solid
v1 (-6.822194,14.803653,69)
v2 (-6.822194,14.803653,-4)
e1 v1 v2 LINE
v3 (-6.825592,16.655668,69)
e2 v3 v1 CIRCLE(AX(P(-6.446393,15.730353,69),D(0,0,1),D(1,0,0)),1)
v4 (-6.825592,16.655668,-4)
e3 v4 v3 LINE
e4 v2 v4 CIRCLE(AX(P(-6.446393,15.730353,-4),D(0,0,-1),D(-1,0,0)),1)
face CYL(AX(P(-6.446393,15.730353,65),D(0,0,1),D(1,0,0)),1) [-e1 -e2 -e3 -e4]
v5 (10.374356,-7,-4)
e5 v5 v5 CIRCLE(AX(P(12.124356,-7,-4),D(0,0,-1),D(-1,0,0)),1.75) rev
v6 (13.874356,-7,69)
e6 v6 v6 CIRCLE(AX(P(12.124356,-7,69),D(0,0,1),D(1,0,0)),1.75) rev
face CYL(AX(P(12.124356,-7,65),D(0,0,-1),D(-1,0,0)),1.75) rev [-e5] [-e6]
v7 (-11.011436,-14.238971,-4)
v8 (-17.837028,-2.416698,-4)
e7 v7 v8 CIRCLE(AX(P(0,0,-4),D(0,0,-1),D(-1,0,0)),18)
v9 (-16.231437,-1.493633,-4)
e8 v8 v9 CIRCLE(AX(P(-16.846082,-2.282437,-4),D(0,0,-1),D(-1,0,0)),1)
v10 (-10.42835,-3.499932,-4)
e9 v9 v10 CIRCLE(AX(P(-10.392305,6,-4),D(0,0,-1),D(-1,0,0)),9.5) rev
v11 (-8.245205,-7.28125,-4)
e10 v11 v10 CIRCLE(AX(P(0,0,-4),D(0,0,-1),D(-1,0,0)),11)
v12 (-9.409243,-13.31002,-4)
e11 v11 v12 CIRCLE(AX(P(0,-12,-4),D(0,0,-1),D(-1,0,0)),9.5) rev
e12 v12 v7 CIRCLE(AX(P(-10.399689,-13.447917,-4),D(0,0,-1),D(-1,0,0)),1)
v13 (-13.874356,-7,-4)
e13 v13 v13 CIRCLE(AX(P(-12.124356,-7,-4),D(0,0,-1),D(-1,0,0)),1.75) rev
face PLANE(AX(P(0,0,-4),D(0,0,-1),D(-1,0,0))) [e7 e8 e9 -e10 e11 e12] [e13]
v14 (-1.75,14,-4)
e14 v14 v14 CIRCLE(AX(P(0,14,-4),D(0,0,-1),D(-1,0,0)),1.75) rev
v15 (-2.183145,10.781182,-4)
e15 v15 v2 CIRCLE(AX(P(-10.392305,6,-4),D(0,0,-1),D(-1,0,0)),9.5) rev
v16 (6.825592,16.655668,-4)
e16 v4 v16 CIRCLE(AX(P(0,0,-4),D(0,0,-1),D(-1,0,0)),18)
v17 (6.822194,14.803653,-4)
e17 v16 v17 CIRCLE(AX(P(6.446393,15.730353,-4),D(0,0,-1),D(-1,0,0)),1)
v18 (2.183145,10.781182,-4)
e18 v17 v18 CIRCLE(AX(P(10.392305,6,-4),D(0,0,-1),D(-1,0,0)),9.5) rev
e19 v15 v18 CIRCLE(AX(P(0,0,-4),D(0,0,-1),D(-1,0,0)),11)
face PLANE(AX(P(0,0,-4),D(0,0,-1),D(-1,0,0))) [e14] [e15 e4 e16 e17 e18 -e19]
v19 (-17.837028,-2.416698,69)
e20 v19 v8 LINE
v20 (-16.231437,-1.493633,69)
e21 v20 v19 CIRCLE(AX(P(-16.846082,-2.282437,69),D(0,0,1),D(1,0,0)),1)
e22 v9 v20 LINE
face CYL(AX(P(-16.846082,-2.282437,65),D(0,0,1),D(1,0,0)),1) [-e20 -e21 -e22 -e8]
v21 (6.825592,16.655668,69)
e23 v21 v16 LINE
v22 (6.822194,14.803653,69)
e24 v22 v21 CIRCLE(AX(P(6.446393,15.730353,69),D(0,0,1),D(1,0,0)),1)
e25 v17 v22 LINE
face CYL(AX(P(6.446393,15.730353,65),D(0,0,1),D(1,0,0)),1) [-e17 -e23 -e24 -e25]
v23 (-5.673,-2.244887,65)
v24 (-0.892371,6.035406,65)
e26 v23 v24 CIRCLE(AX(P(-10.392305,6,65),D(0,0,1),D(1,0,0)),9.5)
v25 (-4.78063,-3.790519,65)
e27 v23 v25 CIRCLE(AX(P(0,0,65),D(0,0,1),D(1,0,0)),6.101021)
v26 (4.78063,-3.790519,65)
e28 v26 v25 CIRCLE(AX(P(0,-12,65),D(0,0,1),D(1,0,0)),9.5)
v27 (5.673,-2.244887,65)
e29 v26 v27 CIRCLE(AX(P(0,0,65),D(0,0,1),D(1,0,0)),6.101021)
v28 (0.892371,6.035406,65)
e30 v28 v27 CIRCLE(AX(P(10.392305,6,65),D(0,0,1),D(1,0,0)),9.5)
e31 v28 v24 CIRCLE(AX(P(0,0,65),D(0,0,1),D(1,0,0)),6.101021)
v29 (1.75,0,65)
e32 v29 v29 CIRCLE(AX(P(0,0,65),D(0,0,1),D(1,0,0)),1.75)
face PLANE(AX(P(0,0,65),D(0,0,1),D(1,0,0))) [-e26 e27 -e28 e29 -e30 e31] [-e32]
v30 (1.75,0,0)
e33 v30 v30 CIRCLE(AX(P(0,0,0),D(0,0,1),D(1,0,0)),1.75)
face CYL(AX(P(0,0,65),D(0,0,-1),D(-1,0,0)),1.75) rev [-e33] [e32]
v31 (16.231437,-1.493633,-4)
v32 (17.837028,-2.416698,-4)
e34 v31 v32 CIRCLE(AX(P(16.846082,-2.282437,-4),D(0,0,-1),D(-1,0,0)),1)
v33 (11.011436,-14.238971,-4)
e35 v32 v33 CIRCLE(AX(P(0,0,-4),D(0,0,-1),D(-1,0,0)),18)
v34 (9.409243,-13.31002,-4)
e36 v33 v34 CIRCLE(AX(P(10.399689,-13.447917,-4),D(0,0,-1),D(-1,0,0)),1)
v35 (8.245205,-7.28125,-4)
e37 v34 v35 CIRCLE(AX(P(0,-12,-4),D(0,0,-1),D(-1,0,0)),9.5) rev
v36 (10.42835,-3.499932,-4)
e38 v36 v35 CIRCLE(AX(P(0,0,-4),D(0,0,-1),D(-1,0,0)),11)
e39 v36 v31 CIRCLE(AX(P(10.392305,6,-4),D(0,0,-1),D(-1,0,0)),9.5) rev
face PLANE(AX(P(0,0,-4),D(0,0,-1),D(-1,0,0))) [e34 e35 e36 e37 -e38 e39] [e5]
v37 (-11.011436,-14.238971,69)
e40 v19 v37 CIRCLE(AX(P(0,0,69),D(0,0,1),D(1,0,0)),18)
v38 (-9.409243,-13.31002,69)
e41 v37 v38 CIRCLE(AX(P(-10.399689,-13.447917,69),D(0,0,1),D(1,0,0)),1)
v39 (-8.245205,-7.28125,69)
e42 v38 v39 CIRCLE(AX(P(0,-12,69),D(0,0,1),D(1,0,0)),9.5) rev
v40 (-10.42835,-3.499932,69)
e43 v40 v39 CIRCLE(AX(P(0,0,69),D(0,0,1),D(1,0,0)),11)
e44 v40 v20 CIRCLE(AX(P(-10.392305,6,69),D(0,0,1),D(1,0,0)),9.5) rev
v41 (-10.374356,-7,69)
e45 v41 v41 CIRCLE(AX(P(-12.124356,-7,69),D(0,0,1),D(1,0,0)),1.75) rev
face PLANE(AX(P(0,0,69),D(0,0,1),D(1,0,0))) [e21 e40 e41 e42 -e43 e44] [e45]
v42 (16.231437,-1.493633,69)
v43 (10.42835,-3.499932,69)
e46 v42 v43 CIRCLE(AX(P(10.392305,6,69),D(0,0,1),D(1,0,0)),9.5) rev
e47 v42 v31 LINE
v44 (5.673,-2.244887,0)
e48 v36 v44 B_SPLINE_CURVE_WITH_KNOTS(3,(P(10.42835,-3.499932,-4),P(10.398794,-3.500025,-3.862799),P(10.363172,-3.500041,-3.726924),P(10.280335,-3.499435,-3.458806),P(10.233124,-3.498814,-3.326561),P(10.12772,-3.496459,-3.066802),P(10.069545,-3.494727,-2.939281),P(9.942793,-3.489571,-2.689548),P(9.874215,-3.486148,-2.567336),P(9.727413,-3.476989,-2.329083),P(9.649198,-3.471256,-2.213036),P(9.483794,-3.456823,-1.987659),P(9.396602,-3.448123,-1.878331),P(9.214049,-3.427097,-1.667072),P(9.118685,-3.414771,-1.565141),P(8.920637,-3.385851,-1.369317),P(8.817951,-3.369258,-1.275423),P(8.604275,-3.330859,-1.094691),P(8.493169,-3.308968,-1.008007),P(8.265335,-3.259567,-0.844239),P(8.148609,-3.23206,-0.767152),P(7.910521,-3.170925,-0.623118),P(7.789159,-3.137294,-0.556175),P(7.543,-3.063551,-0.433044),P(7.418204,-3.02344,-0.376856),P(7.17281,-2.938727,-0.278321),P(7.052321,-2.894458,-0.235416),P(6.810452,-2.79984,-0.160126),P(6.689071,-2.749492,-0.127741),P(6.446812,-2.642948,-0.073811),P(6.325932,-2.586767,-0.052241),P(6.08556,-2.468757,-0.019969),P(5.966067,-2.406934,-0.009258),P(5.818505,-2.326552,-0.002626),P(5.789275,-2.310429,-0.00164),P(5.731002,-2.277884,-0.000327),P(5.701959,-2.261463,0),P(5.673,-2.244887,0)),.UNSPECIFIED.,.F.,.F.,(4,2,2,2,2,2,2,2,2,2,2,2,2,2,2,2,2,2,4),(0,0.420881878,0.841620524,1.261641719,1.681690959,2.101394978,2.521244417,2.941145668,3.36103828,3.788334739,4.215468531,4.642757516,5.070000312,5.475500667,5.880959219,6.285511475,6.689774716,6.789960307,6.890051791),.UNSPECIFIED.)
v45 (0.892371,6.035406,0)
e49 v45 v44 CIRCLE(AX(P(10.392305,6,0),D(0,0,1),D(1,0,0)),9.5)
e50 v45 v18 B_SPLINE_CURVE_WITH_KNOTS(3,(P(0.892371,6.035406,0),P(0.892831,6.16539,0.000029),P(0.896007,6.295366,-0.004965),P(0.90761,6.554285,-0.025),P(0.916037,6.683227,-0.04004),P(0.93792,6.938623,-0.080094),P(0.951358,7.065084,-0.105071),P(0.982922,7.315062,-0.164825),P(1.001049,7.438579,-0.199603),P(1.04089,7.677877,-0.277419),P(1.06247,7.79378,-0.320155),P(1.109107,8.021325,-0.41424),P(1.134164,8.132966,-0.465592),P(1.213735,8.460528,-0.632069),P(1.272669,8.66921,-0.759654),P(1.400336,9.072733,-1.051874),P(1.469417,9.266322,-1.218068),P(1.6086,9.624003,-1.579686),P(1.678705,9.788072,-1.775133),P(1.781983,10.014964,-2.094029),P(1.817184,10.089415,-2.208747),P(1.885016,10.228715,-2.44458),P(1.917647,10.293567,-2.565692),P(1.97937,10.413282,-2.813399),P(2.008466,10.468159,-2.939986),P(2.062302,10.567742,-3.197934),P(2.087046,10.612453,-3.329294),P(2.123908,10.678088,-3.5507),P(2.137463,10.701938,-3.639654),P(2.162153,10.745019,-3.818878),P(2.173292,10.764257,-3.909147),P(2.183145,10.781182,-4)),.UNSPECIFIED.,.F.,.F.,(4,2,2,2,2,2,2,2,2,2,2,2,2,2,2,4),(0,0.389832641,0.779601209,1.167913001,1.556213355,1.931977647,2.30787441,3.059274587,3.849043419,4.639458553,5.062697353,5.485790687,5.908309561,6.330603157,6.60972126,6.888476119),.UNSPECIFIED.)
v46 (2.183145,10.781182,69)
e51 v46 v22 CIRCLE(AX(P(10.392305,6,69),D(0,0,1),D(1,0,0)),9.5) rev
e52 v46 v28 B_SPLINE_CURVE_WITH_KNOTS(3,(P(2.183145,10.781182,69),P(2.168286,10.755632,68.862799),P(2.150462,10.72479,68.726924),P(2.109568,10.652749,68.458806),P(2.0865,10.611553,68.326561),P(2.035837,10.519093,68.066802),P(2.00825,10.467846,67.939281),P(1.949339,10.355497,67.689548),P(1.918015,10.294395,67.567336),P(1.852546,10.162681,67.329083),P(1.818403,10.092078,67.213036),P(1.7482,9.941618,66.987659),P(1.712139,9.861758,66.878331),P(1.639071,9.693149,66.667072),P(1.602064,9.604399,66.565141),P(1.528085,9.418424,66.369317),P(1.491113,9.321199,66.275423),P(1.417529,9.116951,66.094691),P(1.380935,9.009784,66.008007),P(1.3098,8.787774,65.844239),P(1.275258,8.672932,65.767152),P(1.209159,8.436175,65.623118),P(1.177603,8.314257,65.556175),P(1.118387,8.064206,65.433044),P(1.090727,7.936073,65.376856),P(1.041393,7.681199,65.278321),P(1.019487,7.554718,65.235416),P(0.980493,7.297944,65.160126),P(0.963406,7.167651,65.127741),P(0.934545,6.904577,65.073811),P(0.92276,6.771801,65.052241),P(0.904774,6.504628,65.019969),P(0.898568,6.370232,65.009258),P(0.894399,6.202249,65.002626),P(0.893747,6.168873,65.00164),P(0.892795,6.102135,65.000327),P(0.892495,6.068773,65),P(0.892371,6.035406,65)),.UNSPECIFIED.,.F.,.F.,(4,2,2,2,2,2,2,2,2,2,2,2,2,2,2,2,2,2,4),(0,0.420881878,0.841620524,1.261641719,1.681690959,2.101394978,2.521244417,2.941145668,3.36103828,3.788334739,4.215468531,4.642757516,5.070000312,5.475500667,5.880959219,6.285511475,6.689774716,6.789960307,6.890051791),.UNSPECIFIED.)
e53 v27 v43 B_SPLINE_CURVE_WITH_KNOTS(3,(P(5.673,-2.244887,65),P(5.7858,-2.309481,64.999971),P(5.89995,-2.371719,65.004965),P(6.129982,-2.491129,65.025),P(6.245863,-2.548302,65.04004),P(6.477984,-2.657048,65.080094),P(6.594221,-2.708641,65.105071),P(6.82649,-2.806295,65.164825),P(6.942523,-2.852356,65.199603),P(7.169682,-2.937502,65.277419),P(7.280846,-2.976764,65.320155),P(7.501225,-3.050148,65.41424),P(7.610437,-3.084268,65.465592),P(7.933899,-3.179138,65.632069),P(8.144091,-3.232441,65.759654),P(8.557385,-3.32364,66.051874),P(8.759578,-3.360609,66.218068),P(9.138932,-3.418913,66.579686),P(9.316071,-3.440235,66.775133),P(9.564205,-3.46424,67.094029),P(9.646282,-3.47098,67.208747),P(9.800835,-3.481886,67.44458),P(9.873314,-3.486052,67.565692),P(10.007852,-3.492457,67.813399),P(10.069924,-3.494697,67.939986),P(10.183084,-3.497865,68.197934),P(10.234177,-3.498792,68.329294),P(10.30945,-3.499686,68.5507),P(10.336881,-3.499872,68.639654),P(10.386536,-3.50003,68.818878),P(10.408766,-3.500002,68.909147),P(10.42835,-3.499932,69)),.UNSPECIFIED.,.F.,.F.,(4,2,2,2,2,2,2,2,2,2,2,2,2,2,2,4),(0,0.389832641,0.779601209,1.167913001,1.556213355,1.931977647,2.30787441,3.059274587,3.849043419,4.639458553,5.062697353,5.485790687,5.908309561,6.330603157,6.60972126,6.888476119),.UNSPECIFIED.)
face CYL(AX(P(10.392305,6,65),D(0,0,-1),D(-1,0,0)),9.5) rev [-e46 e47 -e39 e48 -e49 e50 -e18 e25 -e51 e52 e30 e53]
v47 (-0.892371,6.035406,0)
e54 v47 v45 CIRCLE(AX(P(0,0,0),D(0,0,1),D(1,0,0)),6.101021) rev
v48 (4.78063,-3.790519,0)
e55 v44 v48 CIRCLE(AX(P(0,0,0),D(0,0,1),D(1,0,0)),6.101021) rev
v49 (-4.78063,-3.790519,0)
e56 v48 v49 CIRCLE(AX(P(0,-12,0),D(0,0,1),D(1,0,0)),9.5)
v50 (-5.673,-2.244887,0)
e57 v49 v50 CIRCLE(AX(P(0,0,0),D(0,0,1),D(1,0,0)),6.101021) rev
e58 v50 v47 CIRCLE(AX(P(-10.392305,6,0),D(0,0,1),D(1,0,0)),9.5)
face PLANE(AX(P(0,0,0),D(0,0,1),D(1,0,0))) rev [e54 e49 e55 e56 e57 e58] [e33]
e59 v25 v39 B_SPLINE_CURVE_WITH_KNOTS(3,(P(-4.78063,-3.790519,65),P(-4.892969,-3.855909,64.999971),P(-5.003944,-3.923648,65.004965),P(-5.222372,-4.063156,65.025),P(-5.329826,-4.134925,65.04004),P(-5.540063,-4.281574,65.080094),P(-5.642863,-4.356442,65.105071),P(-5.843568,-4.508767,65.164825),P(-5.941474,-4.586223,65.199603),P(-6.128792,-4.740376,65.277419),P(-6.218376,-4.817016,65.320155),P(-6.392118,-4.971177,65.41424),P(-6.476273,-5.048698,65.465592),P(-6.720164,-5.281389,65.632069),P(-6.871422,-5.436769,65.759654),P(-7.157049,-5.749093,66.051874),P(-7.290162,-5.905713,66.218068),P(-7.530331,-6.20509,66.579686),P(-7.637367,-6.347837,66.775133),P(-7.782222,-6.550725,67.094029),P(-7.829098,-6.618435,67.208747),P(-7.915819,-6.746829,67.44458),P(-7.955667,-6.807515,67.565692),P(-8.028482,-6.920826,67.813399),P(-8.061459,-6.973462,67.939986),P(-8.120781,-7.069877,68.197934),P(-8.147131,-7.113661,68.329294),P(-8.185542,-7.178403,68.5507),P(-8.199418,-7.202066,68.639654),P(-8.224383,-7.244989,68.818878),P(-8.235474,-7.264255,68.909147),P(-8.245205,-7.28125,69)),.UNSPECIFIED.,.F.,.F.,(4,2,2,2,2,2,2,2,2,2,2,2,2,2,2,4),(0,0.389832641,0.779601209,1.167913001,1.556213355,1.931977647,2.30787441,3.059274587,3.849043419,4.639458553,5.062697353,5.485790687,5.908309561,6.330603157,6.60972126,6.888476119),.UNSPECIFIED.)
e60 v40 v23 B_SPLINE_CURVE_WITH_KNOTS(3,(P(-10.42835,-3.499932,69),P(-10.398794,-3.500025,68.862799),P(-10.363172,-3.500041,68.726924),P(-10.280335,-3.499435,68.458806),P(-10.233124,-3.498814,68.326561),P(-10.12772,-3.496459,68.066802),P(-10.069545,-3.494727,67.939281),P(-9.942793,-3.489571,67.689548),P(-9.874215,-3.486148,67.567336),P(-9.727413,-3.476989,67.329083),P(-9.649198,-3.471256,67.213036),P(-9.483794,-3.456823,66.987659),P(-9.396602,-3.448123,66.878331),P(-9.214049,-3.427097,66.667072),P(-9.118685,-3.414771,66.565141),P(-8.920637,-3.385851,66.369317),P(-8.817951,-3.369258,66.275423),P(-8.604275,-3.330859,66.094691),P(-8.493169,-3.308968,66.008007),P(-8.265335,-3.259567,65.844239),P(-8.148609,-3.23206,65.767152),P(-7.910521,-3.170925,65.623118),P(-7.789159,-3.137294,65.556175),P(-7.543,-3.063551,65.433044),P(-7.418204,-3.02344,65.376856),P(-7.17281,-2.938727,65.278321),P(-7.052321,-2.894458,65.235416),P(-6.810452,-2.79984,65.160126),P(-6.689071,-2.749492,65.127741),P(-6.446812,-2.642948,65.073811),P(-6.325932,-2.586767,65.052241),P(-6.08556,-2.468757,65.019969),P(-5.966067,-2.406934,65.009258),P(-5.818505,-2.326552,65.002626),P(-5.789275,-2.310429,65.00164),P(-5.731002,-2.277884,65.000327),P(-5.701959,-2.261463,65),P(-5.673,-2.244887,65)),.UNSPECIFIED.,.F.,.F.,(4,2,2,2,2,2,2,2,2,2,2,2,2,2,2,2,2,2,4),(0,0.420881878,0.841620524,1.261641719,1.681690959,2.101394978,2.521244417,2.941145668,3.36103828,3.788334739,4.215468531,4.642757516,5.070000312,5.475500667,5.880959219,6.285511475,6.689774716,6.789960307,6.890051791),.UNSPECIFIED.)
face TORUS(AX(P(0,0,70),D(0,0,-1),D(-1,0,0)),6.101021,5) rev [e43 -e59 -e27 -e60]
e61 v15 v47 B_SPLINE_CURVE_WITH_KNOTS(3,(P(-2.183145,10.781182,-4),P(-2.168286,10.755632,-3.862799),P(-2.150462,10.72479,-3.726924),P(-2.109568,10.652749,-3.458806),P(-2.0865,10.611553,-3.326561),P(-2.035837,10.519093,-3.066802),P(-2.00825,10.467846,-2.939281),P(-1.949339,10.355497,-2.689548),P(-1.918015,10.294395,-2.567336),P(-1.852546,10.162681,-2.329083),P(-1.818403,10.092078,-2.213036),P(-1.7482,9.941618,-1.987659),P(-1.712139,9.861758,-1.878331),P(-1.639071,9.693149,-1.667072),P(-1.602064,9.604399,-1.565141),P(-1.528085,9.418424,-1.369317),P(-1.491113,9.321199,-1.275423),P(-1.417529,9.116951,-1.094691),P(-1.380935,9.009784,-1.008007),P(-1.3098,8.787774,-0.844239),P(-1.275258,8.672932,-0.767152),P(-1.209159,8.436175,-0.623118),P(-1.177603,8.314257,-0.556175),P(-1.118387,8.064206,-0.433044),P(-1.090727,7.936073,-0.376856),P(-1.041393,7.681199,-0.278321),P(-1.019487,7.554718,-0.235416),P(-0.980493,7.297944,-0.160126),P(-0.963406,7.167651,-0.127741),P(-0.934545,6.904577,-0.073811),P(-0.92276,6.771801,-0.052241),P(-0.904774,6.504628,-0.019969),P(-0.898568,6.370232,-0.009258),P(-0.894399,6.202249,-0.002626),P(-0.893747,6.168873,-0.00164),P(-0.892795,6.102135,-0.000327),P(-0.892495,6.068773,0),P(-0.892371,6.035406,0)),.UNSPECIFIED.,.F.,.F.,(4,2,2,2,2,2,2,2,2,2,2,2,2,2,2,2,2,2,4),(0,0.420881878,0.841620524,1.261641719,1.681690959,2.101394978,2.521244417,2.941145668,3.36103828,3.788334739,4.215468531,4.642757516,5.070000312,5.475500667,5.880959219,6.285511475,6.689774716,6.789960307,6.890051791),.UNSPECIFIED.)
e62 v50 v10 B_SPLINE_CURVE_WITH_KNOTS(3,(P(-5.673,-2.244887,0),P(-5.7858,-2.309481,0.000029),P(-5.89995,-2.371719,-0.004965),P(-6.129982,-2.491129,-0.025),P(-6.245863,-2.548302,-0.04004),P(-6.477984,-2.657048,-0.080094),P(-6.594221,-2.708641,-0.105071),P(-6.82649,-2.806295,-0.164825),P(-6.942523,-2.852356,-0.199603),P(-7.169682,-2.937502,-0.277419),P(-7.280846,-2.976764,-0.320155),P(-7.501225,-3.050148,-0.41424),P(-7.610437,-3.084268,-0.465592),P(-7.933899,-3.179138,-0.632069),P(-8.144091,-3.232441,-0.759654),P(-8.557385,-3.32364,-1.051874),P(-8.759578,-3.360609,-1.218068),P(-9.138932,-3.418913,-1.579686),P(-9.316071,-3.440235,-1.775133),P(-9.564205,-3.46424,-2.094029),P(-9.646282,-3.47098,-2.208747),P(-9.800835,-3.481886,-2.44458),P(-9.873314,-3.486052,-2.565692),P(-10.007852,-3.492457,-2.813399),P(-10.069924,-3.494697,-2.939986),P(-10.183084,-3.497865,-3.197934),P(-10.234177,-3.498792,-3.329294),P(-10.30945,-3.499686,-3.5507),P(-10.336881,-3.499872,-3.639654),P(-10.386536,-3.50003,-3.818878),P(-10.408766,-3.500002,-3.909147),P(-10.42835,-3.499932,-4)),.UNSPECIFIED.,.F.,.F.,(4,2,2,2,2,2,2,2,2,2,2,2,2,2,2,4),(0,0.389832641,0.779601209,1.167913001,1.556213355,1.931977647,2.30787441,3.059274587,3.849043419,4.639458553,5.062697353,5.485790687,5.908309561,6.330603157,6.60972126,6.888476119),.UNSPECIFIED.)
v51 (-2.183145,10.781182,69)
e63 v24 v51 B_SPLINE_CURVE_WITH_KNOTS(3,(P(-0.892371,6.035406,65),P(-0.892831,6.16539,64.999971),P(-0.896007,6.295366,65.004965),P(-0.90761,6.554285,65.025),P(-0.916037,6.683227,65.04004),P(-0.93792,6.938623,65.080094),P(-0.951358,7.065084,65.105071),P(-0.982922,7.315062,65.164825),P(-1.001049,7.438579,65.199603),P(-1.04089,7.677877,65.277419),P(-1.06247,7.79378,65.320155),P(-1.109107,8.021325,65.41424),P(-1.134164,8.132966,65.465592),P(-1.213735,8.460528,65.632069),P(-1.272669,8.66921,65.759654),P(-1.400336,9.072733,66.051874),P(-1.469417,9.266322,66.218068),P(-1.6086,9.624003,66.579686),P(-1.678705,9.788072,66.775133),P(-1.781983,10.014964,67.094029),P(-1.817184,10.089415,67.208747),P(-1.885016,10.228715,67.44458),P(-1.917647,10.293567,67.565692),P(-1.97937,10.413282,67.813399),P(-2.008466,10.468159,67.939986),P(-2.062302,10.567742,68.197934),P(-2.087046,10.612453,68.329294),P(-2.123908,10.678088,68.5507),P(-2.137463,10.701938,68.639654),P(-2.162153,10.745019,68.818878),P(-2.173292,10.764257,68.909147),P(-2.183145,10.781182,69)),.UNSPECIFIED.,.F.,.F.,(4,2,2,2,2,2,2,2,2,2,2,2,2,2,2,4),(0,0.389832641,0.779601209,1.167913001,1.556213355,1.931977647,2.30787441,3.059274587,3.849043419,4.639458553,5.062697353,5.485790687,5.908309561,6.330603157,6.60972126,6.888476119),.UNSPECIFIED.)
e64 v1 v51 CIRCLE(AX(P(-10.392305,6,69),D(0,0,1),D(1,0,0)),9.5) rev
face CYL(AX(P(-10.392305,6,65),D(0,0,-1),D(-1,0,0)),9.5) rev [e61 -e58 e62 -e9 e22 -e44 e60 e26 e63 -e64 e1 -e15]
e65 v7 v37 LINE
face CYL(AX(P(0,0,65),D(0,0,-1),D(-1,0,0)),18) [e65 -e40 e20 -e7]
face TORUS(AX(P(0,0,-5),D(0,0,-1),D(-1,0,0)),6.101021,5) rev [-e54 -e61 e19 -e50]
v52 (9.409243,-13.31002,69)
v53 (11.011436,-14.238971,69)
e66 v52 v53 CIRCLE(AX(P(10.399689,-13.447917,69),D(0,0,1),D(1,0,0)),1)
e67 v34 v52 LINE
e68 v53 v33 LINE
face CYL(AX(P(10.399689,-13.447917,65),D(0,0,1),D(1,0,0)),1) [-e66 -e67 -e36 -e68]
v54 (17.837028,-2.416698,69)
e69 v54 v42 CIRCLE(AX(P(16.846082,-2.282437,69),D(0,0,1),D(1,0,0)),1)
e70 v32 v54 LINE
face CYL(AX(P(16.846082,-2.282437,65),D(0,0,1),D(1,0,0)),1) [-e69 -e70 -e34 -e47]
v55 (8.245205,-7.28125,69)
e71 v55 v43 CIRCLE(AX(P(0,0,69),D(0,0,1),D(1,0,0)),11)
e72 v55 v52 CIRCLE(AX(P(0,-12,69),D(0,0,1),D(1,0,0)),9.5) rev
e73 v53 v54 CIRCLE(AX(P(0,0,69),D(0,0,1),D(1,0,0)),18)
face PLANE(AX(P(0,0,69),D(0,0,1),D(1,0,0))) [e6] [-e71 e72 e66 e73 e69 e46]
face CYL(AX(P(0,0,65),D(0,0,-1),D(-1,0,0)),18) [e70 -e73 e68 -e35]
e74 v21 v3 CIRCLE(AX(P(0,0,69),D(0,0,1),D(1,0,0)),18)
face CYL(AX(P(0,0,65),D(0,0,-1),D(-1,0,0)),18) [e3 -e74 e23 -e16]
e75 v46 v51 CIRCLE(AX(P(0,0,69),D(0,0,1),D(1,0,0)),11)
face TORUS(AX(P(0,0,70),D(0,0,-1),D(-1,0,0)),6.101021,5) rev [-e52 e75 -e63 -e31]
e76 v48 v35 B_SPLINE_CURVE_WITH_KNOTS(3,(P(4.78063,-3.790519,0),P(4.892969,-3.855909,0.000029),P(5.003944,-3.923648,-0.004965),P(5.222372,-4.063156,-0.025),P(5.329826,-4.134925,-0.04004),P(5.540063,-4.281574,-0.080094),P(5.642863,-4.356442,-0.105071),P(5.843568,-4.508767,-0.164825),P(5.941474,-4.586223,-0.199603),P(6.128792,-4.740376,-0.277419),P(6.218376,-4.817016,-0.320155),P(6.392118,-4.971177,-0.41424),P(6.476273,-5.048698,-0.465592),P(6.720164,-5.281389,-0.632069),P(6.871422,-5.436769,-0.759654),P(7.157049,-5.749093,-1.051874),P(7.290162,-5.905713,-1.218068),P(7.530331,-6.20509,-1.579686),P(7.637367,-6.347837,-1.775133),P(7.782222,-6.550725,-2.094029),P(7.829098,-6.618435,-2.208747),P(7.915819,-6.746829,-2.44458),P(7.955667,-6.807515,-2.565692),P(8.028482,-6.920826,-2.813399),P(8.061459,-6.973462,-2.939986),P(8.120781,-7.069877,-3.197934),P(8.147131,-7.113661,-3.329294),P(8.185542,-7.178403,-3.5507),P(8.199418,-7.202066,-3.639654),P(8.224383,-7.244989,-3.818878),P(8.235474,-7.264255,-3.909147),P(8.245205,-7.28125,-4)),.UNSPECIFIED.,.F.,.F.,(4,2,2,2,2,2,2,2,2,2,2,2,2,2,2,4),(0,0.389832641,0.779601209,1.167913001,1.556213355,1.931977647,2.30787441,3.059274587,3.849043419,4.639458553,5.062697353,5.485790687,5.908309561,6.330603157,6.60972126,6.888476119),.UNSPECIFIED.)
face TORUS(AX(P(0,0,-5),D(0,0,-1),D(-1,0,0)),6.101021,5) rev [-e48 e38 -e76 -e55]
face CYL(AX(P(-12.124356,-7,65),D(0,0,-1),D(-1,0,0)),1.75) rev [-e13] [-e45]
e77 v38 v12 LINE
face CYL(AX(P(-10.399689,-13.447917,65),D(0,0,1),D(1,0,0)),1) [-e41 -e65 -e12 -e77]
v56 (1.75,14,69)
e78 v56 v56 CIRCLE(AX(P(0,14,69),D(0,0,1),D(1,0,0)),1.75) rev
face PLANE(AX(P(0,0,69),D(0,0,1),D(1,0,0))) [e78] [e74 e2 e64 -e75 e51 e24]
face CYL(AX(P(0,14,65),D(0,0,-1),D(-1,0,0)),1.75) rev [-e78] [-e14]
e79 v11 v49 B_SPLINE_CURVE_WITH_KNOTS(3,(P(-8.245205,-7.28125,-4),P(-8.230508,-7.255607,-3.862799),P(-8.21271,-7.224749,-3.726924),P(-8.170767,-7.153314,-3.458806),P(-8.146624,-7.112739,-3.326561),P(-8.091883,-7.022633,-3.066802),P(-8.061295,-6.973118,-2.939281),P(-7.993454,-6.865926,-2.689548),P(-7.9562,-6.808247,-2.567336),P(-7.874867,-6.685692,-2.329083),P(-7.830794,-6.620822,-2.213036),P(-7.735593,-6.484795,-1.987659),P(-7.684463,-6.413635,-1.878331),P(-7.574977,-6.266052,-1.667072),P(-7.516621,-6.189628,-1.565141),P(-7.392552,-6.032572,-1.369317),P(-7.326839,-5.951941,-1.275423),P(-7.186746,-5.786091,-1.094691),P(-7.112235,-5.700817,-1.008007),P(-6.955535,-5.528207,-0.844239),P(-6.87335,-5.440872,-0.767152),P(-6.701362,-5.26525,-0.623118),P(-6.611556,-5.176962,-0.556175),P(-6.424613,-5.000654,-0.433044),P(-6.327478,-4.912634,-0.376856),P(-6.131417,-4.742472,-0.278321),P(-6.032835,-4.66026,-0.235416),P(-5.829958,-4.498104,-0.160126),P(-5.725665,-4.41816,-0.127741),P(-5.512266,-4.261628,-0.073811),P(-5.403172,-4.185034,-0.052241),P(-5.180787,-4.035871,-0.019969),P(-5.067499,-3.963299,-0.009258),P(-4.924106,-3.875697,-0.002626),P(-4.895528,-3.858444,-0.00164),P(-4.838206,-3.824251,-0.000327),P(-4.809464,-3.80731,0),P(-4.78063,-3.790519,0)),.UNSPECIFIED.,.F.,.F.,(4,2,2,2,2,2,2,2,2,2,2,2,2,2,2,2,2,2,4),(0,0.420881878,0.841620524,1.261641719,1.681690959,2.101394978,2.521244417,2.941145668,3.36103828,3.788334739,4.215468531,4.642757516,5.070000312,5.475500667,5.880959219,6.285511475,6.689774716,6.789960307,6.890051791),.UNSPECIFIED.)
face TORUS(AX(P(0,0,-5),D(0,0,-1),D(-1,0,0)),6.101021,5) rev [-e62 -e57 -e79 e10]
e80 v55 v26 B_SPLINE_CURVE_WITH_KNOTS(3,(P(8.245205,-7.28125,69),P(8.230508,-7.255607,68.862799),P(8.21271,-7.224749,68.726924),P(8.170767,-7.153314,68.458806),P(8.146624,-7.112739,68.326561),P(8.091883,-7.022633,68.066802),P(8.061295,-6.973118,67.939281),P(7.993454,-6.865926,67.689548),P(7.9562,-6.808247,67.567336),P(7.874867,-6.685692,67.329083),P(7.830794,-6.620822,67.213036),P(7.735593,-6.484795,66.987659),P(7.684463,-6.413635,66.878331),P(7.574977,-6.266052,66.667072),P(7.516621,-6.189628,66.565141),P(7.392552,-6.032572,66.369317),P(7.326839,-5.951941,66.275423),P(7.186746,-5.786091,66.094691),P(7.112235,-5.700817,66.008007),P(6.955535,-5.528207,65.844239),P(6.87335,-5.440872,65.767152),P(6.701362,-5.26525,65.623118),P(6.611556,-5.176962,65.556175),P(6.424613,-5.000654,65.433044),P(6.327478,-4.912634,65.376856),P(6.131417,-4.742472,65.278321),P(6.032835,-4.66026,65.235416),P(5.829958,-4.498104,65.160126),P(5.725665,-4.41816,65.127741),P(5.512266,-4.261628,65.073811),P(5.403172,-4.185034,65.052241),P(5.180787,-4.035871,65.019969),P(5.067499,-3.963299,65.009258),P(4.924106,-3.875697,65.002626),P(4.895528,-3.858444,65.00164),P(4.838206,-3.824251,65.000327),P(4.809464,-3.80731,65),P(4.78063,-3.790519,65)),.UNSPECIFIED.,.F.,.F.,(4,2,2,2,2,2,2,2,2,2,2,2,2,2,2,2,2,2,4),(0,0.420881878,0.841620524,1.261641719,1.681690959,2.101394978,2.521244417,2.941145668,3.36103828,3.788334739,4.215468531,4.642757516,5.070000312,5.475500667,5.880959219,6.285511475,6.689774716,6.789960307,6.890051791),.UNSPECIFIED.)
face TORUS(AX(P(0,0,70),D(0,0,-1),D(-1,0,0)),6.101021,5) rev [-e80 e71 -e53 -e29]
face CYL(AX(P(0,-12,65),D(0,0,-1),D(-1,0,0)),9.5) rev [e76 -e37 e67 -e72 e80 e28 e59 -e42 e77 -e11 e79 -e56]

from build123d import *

# Parameters (mm, degrees)
SKETCH_1_R      = 1.75
EXTRUDE_1_DEPTH = 65
FILLET_1_R      = 1
SKETCH_2_R      = 1.75
EXTRUDE_2_DEPTH = 4
FILLET_2_R      = 5
EXTRUDE_START   = 4
SKETCH_3_R      = 1.75
EXTRUDE_3_DEPTH = 4
FILLET_3_R      = 5


with BuildPart() as part:
    # Эскиз1 → Бобышка-Вытянуть1 (new body)
    with BuildSketch(Plane.XY):
        with BuildLine():
            ThreePointArc((8.733013025, -15.739583333), (15.511193288, -9.132517877), (18, 0))
            ThreePointArc((18, 0), (17.999346369, 0.153395838), (17.997385524, 0.306780536))
            ThreePointArc((17.997385524, 0.306780536), (2.165063509, 1.25), (9.264372499, 15.432802798))
            ThreePointArc((9.264372499, 15.432802798), (0, 18), (-9.264372499, 15.432802798))
            ThreePointArc((-9.264372499, 15.432802798), (-3.287188474, 12.30613363), (-0.892304845, 6))
            ThreePointArc((-0.892304845, 6), (-7.392160386, -3.013830108), (-17.997385524, 0.306780536))
            ThreePointArc((-17.997385524, 0.306780536), (-15.588457268, -9), (-8.733013025, -15.739583333))
            ThreePointArc((-8.733013025, -15.739583333), (-1.908713738, -2.693721911), (9.5, -12))
            ThreePointArc((9.5, -12), (9.306278089, -13.908713738), (8.733013025, -15.739583333))
        make_face()
        with Locations((-12.124355653, -7)):
            Circle(SKETCH_1_R, mode=Mode.SUBTRACT)
        with Locations((12.124355653, -7)):
            Circle(SKETCH_1_R, mode=Mode.SUBTRACT)
        Circle(SKETCH_1_R, mode=Mode.SUBTRACT)
        with Locations((0, 14)):
            Circle(SKETCH_1_R, mode=Mode.SUBTRACT)
    extrude(amount=EXTRUDE_1_DEPTH)

    # Скругление1
    fillet_1_edges = [part.edges().sort_by_distance(p)[0] for p in [
        (17.997385524, 0.306780536, 32.5),
        (8.733013025, -15.739583333, 32.5),
        (-8.733013025, -15.739583333, 32.5),
        (-17.997385524, 0.306780536, 32.5),
        (-9.264372499, 15.432802798, 32.5),
        (9.264372499, 15.432802798, 32.5),
    ]]
    fillet(fillet_1_edges, radius=FILLET_1_R)

    # Эскиз2 → Бобышка-Вытянуть2 (add)
    # profile 1 of 3: a face of its own
    with BuildSketch(Plane.XY.offset(65)):
        with BuildLine():
            ThreePointArc((6.822193962, 14.803653121), (7.446391133, 15.728518462), (6.825592394, 16.655668359))
            ThreePointArc((6.825592394, 16.655668359), (0, 18), (-6.825592394, 16.655668359))
            ThreePointArc((-6.825592394, 16.655668359), (-7.446391133, 15.728518462), (-6.822193962, 14.803653121))
            ThreePointArc((-6.822193962, 14.803653121), (-4.168730882, 13.177543251), (-2.183145185, 10.781181619))
            ThreePointArc((-2.183145185, 10.781181619), (0, 11), (2.183145185, 10.781181619))
            ThreePointArc((2.183145185, 10.781181619), (4.168730882, 13.177543251), (6.822193962, 14.803653121))
        make_face()
        with Locations((0, 14)):
            Circle(SKETCH_2_R, mode=Mode.SUBTRACT)
    # profile 2 of 3: a face of its own
    with BuildSketch(Plane.XY.offset(65)):
        with BuildLine():
            ThreePointArc((17.837028113, -2.41669777), (17.344492118, -1.415495343), (16.231436653, -1.49363328))
            ThreePointArc((16.231436653, -1.49363328), (13.496452656, -2.97854478), (10.428349757, -3.499931619))
            ThreePointArc((10.428349757, -3.499931619), (9.526279442, -5.5), (8.245204572, -7.28125))
            ThreePointArc((8.245204572, -7.28125), (9.1809434, -9.558631883), (9.5, -12))
            ThreePointArc((9.5, -12), (9.477283513, -12.656579941), (9.409242691, -13.310019841))
            ThreePointArc((9.409242691, -13.310019841), (9.898100985, -14.313023118), (11.011435719, -14.238970588))
            ThreePointArc((11.011435719, -14.238970588), (15.588457268, -9), (17.837028113, -2.41669777))
        make_face()
        with Locations((12.124355653, -7)):
            Circle(SKETCH_2_R, mode=Mode.SUBTRACT)
    # profile 3 of 3: a face of its own
    with BuildSketch(Plane.XY.offset(65)):
        with BuildLine():
            ThreePointArc((-10.428349757, -3.499931619), (-13.496452656, -2.97854478), (-16.231436653, -1.49363328))
            ThreePointArc((-16.231436653, -1.49363328), (-17.344492118, -1.415495343), (-17.837028113, -2.41669777))
            ThreePointArc((-17.837028113, -2.41669777), (-15.588457268, -9), (-11.011435719, -14.238970588))
            ThreePointArc((-11.011435719, -14.238970588), (-9.898100985, -14.313023118), (-9.409242691, -13.310019841))
            ThreePointArc((-9.409242691, -13.310019841), (-9.327721774, -10.198998471), (-8.245204572, -7.28125))
            ThreePointArc((-8.245204572, -7.28125), (-9.526279442, -5.5), (-10.428349757, -3.499931619))
        make_face()
        with Locations((-12.124355653, -7)):
            Circle(SKETCH_2_R, mode=Mode.SUBTRACT)
    extrude(amount=EXTRUDE_2_DEPTH)

    # Скругление2
    # the kernel refuses this fillet: 5 mm, written as the material it adds along each edge
    with BuildSketch(Plane(origin=(0, 0, 65), x_dir=(0.26290330045081145, -0.9648221880803066, 0), z_dir=(0.9648221880803066, 0.26290330045081145, 0))) as fillet_2_piece_1_section:
        with BuildLine():
            CenterArc((6.101020514, -5), FILLET_2_R, 11.536959033, 78.463040967)
            Line((6.101020514, 0), (6.101020514, 0.1))
            Line((6.101020514, 0.1), (11, 0.1))
            Line((11, 0.1), (11.1, 0))
            ThreePointArc((11.1, 0), (11.1, -2), (11.09797959, -3.98))
            Line((11.09797959, -3.98), (11, -4))
        make_face()
    fillet_2_piece_1 = revolve(axis=Axis((0, 0, 65), (0, 0, -1)), revolution_arc=150.484807428, mode=Mode.PRIVATE)
    fillet_2_piece_1 = fillet_2_piece_1 - Plane(origin=(-10.392304845, 6, 66.122013519), x_dir=(0.1187297206541081, 0.9929266102957446, 0), z_dir=(0, 0, -1)) * Cylinder(9.5, 45, mode=Mode.PRIVATE)
    fillet_2_piece_1 = fillet_2_piece_1 - Plane(origin=(0, -12, 66.122013519), x_dir=(-0.9192645289367253, -0.3936403508772196, 0), z_dir=(0, 0, -1)) * Cylinder(9.5, 45, mode=Mode.PRIVATE)
    add(fillet_2_piece_1)
    with BuildSketch(Plane(origin=(0, 0, 65), x_dir=(0.7041088747870229, 0.7100920309693333, 0), z_dir=(-0.7100920309693333, 0.7041088747870229, 0))) as fillet_2_piece_2_section:
        with BuildLine():
            CenterArc((6.101020514, -5), FILLET_2_R, 11.536959033, 78.463040967)
            Line((11, -4), (11.09797959, -3.98))
            ThreePointArc((11.09797959, -3.98), (11.1, -2), (11.1, 0))
            Line((11.1, 0), (11, 0.1))
            Line((11, 0.1), (6.101020514, 0.1))
            Line((6.101020514, 0.1), (6.101020514, 0))
        make_face()
    fillet_2_piece_2 = revolve(axis=Axis((0, 0, 65), (0, 0, -1)), revolution_arc=150.484807428, mode=Mode.PRIVATE)
    fillet_2_piece_2 = fillet_2_piece_2 - Plane(origin=(10.392304845, 6, 66.122013516), x_dir=(0.8005348082826462, -0.5992862594185411, 0), z_dir=(0, 0, -1)) * Cylinder(9.5, 45, mode=Mode.PRIVATE)
    fillet_2_piece_2 = fillet_2_piece_2 - Plane(origin=(0, -12, 66.122013516), x_dir=(-0.9192645289367253, -0.3936403508772196, 0), z_dir=(0, 0, -1)) * Cylinder(9.5, 45, mode=Mode.PRIVATE)
    add(fillet_2_piece_2)
    with BuildSketch(Plane(origin=(0, 0, 65), x_dir=(-0.9670121752378409, 0.2547301571109701, 0), z_dir=(-0.2547301571109701, -0.9670121752378409, 0))) as fillet_2_piece_3_section:
        with BuildLine():
            CenterArc((6.101020514, -5), FILLET_2_R, 11.536959033, 78.463040967)
            Line((6.101020514, 0), (6.101020514, 0.1))
            Line((6.101020514, 0.1), (11, 0.1))
            Line((11, 0.1), (11.1, 0))
            ThreePointArc((11.1, 0), (11.1, -2), (11.09797959, -3.98))
            Line((11.09797959, -3.98), (11, -4))
        make_face()
    fillet_2_piece_3 = revolve(axis=Axis((0, 0, 65), (0, 0, -1)), revolution_arc=150.484807428, mode=Mode.PRIVATE)
    fillet_2_piece_3 = fillet_2_piece_3 - Plane(origin=(10.392304845, 6, 66.122013519), x_dir=(0.8005348082826462, -0.5992862594185411, 0), z_dir=(0, 0, -1)) * Cylinder(9.5, 45, mode=Mode.PRIVATE)
    fillet_2_piece_3 = fillet_2_piece_3 - Plane(origin=(-10.392304845, 6, 66.122013519), x_dir=(0.1187297206541081, 0.9929266102957446, 0), z_dir=(0, 0, -1)) * Cylinder(9.5, 45, mode=Mode.PRIVATE)
    add(fillet_2_piece_3)

    # Эскиз3 → Бобышка-Вытянуть3 (add)
    # profile 1 of 3: a face of its own
    with BuildSketch(Plane(origin=(0, 0, 0), x_dir=(-1, 0, 0), z_dir=(0, 0, -1)).offset(EXTRUDE_START)):
        with BuildLine():
            ThreePointArc((-2.183145185, 10.781181619), (0, 11), (2.183145185, 10.781181619))
            ThreePointArc((2.183145185, 10.781181619), (4.168730882, 13.177543251), (6.822193962, 14.803653121))
            ThreePointArc((6.822193962, 14.803653121), (7.446391133, 15.728518462), (6.825592394, 16.655668359))
            ThreePointArc((6.825592394, 16.655668359), (0, 18), (-6.825592394, 16.655668359))
            ThreePointArc((-6.825592394, 16.655668359), (-7.446391133, 15.728518462), (-6.822193962, 14.803653121))
            ThreePointArc((-6.822193962, 14.803653121), (-4.168730882, 13.177543251), (-2.183145185, 10.781181619))
        make_face()
        with Locations((0, 14)):
            Circle(SKETCH_3_R, mode=Mode.SUBTRACT)
    # profile 2 of 3: a face of its own
    with BuildSketch(Plane(origin=(0, 0, 0), x_dir=(-1, 0, 0), z_dir=(0, 0, -1)).offset(EXTRUDE_START)):
        with BuildLine():
            ThreePointArc((-8.245204572, -7.28125), (-9.526279442, -5.5), (-10.428349757, -3.499931619))
            ThreePointArc((-10.428349757, -3.499931619), (-13.496452656, -2.97854478), (-16.231436653, -1.49363328))
            ThreePointArc((-16.231436653, -1.49363328), (-17.344492118, -1.415495343), (-17.837028113, -2.41669777))
            ThreePointArc((-17.837028113, -2.41669777), (-15.588457268, -9), (-11.011435719, -14.238970588))
            ThreePointArc((-11.011435719, -14.238970588), (-9.898100985, -14.313023118), (-9.409242691, -13.310019841))
            ThreePointArc((-9.409242691, -13.310019841), (-9.327721774, -10.198998471), (-8.245204572, -7.28125))
        make_face()
        with Locations((-12.124355653, -7)):
            Circle(SKETCH_3_R, mode=Mode.SUBTRACT)
    # profile 3 of 3: a face of its own
    with BuildSketch(Plane(origin=(0, 0, 0), x_dir=(-1, 0, 0), z_dir=(0, 0, -1)).offset(EXTRUDE_START)):
        with BuildLine():
            ThreePointArc((16.231436653, -1.49363328), (13.496452656, -2.97854478), (10.428349757, -3.499931619))
            ThreePointArc((10.428349757, -3.499931619), (9.526279442, -5.5), (8.245204572, -7.28125))
            ThreePointArc((8.245204572, -7.28125), (9.327721774, -10.198998471), (9.409242691, -13.310019841))
            ThreePointArc((9.409242691, -13.310019841), (9.898100985, -14.313023118), (11.011435719, -14.238970588))
            ThreePointArc((11.011435719, -14.238970588), (15.588457268, -9), (17.837028113, -2.41669777))
            ThreePointArc((17.837028113, -2.41669777), (17.344492118, -1.415495343), (16.231436653, -1.49363328))
        make_face()
        with Locations((12.124355653, -7)):
            Circle(SKETCH_3_R, mode=Mode.SUBTRACT)
    extrude(amount=-EXTRUDE_3_DEPTH)

    # Скругление3
    # the kernel refuses this fillet: 5 mm, written as the material it adds along each edge
    with BuildSketch(Plane(origin=(0, 0, 0), x_dir=(-0.26290330045081245, -0.9648221880803063, 0), z_dir=(-0.9648221880803063, 0.26290330045081245, 0))) as fillet_3_piece_1_section:
        with BuildLine():
            CenterArc((6.101020514, -5), FILLET_3_R, 11.536959033, 78.463040967)
            Line((11, -4), (11.09797959, -3.98))
            ThreePointArc((11.09797959, -3.98), (11.1, -2), (11.1, 0))
            Line((11.1, 0), (11, 0.1))
            Line((11, 0.1), (6.101020514, 0.1))
            Line((6.101020514, 0.1), (6.101020514, 0))
        make_face()
    fillet_3_piece_1 = revolve(axis=Axis((0, 0, 0), (0, 0, 1)), revolution_arc=150.484807428, mode=Mode.PRIVATE)
    fillet_3_piece_1 = fillet_3_piece_1 - Plane(origin=(0, -12, -1.122013516), x_dir=(-0.9192645289367253, -0.3936403508772196, 0), z_dir=(0, 0, -1)) * Cylinder(9.5, 45, mode=Mode.PRIVATE)
    fillet_3_piece_1 = fillet_3_piece_1 - Plane(origin=(10.392304845, 6, -1.122013516), x_dir=(0.8005348082826462, -0.5992862594185411, 0), z_dir=(0, 0, -1)) * Cylinder(9.5, 45, mode=Mode.PRIVATE)
    add(fillet_3_piece_1)
    with BuildSketch(Plane(origin=(0, 0, 0), x_dir=(0.9670121752378399, 0.25473015711097347, 0), z_dir=(0.25473015711097347, -0.9670121752378399, 0))) as fillet_3_piece_2_section:
        with BuildLine():
            CenterArc((6.101020514, -5), FILLET_3_R, 11.536959033, 78.463040967)
            Line((11, -4), (11.09797959, -3.98))
            ThreePointArc((11.09797959, -3.98), (11.1, -2), (11.1, 0))
            Line((11.1, 0), (11, 0.1))
            Line((11, 0.1), (6.101020514, 0.1))
            Line((6.101020514, 0.1), (6.101020514, 0))
        make_face()
    fillet_3_piece_2 = revolve(axis=Axis((0, 0, 0), (0, 0, 1)), revolution_arc=150.484807428, mode=Mode.PRIVATE)
    fillet_3_piece_2 = fillet_3_piece_2 - Plane(origin=(-10.392304845, 6, -1.122013516), x_dir=(0.1187297206541081, 0.9929266102957446, 0), z_dir=(0, 0, -1)) * Cylinder(9.5, 45, mode=Mode.PRIVATE)
    fillet_3_piece_2 = fillet_3_piece_2 - Plane(origin=(10.392304845, 6, -1.122013516), x_dir=(0.8005348082826462, -0.5992862594185411, 0), z_dir=(0, 0, -1)) * Cylinder(9.5, 45, mode=Mode.PRIVATE)
    add(fillet_3_piece_2)
    with BuildSketch(Plane(origin=(0, 0, 0), x_dir=(-0.7041088747870177, 0.7100920309693384, 0), z_dir=(0.7100920309693384, 0.7041088747870177, 0))) as fillet_3_piece_3_section:
        with BuildLine():
            CenterArc((6.101020514, -5), FILLET_3_R, 11.536959033, 78.463040967)
            Line((11, -4), (11.09797959, -3.98))
            ThreePointArc((11.09797959, -3.98), (11.1, -2), (11.1, 0))
            Line((11.1, 0), (11, 0.1))
            Line((11, 0.1), (6.101020514, 0.1))
            Line((6.101020514, 0.1), (6.101020514, 0))
        make_face()
    fillet_3_piece_3 = revolve(axis=Axis((0, 0, 0), (0, 0, 1)), revolution_arc=150.484807428, mode=Mode.PRIVATE)
    fillet_3_piece_3 = fillet_3_piece_3 - Plane(origin=(0, -12, -1.122013516), x_dir=(-0.9192645289367253, -0.3936403508772196, 0), z_dir=(0, 0, -1)) * Cylinder(9.5, 45, mode=Mode.PRIVATE)
    fillet_3_piece_3 = fillet_3_piece_3 - Plane(origin=(-10.392304845, 6, -1.122013516), x_dir=(0.1187297206541081, 0.9929266102957446, 0), z_dir=(0, 0, -1)) * Cylinder(9.5, 45, mode=Mode.PRIVATE)
    add(fillet_3_piece_3)


solid = part.part
